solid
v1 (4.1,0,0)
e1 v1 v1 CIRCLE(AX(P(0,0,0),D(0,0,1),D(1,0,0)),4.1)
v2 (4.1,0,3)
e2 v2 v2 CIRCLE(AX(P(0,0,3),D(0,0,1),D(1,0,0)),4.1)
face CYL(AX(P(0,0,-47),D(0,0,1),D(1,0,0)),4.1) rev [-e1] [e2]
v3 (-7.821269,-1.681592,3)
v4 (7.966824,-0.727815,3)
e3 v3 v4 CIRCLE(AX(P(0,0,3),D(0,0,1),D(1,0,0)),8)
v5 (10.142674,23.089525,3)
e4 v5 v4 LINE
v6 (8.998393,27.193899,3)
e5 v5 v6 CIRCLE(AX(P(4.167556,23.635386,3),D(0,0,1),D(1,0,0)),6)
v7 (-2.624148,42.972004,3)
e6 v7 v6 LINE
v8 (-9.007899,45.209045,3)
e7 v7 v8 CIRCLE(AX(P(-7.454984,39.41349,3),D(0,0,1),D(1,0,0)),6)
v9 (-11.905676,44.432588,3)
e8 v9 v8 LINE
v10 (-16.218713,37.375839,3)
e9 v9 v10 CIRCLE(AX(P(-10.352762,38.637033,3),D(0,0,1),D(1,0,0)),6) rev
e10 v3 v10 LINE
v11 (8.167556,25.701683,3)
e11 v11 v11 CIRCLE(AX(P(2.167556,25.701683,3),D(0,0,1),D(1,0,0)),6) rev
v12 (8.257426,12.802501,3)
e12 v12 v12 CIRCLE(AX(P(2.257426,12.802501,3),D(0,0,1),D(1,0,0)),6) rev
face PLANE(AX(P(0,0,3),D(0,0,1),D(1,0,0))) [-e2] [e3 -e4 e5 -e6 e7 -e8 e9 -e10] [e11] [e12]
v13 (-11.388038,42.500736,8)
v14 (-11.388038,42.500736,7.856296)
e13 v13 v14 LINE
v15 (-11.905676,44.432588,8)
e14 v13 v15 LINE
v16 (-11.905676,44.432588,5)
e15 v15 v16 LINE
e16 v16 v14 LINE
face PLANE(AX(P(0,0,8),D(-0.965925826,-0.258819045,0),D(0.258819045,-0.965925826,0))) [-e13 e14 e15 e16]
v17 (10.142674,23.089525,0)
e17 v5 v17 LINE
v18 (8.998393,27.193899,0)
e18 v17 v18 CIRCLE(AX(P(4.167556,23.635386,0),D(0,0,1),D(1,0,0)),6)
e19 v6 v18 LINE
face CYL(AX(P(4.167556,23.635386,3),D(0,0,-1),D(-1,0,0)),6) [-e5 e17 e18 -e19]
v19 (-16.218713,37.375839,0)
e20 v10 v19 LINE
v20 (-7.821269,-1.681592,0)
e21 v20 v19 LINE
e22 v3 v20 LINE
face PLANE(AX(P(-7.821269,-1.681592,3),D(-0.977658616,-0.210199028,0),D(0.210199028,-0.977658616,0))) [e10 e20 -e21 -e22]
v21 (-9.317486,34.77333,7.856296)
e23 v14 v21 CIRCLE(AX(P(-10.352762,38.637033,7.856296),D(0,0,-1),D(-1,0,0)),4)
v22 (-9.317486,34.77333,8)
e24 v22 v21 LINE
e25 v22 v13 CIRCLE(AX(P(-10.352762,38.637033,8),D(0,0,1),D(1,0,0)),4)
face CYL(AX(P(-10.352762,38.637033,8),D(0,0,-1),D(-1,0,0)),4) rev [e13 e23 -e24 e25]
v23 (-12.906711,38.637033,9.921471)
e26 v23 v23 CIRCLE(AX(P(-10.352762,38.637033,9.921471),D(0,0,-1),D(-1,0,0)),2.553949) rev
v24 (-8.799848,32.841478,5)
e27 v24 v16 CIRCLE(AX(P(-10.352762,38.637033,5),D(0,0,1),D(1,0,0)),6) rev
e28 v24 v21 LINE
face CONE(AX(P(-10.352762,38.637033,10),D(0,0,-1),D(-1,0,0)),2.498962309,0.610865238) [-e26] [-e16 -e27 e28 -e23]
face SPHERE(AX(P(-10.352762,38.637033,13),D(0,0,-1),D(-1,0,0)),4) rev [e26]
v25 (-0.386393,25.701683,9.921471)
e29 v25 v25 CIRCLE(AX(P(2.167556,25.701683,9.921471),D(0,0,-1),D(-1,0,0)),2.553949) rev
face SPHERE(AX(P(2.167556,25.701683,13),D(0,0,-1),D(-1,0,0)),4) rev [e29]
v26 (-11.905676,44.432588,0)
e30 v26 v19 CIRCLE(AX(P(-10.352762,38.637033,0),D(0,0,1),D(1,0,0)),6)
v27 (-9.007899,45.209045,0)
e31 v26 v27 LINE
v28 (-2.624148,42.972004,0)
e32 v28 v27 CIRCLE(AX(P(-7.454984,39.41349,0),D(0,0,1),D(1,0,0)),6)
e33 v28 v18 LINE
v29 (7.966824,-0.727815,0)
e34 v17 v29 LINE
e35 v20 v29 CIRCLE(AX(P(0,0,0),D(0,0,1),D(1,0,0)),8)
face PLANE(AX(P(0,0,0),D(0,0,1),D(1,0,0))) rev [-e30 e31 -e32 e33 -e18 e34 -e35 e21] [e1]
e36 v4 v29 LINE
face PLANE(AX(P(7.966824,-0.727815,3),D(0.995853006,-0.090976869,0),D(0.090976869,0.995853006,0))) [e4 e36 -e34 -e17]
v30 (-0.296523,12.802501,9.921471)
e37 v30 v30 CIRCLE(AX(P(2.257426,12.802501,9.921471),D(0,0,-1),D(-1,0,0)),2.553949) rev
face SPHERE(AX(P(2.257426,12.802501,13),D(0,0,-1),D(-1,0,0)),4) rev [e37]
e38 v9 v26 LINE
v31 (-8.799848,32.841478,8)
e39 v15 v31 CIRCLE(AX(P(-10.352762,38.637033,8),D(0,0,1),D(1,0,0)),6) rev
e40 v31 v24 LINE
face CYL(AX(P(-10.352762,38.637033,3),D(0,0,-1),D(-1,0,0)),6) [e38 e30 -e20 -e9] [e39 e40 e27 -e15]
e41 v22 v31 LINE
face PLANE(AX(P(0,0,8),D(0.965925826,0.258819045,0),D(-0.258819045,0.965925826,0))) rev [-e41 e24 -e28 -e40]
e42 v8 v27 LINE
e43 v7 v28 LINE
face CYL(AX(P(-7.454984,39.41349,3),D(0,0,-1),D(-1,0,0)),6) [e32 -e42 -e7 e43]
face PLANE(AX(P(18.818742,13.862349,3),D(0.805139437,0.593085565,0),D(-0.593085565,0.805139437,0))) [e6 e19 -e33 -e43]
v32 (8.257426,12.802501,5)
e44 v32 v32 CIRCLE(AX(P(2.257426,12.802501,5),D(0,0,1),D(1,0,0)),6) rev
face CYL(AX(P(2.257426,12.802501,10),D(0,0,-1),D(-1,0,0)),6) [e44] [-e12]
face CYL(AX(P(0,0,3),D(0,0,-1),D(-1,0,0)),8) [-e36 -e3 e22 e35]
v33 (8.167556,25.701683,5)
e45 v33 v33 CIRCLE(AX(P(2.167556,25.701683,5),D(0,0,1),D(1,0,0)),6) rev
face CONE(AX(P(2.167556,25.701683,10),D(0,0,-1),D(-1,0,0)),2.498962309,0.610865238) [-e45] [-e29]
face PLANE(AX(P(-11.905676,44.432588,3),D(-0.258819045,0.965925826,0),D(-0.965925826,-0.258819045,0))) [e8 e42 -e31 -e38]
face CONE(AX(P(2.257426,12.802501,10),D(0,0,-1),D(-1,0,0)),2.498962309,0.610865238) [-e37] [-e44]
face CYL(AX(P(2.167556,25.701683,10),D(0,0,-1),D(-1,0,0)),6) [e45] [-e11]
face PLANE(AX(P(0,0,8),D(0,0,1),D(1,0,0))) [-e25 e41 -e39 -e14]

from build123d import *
from build123d.topology import SkipClean

# Parameters (mm, degrees)
BOSS_EXTRUDE1_DEPTH = 3
SKETCH3_R           = 4.1
CUT_EXTRUDE1_DEPTH  = 50
SKETCH1_3_R         = 6
BOSS_EXTRUDE2_DEPTH = 10
SKETCH1_4_R         = 6
BOSS_EXTRUDE3_DEPTH = 10
SKETCH1_5_R         = 6
BOSS_EXTRUDE8_DEPTH = 10
CHAMFER8_SIZE       = 5
CHAMFER8_SIZE_2     = 3.501037691
BOSS_EXTRUDE7_START = 1.9999999
BOSS_EXTRUDE7_DEPTH = 3.0000001


# Read off the part's stored shape, not the designer's step: Boss-Extrude7
with BuildPart() as part:
    # Sketch1 → Boss-Extrude1 (new body)
    with BuildSketch(Plane.XY):
        with BuildLine():
            ThreePointArc((-7.821268925, -1.68159222), (0.48240993, -7.985441795), (7.966824047, -0.727814955))
            Line((7.966824047, -0.727814955), (10.142674299, 23.089524856))
            ThreePointArc((10.142674299, 23.089524856), (9.947144202, 25.246709523), (8.998392886, 27.19389946))
            Line((8.998392886, 27.19389946), (-2.624147703, 42.972003574))
            ThreePointArc((-2.624147703, 42.972003574), (-5.470725652, 45.075885221), (-9.007898596, 45.209045145))
            Line((-9.007898596, 45.209045145), (-11.905676075, 44.432588009))
            ThreePointArc((-11.905676075, 44.432588009), (-15.472265696, 41.766039268), (-16.218713498, 37.375838886))
            Line((-16.218713498, 37.375838886), (-7.821268925, -1.68159222))
        make_face()
    extrude(amount=BOSS_EXTRUDE1_DEPTH)

    # Sketch3 → Cut-Extrude1 (cut)
    with BuildSketch(Plane.XY.offset(3)):
        Circle(SKETCH3_R)
    extrude(amount=-CUT_EXTRUDE1_DEPTH, mode=Mode.SUBTRACT)

    # Sketch1<3> → Boss-Extrude2 (add)
    with BuildSketch(Plane.XY):
        with Locations(Location((-10.352761804, 38.637033052, 0), (0, 0, 192.134016017))):
            Circle(SKETCH1_3_R)
    extrude(amount=BOSS_EXTRUDE2_DEPTH)

    # Sketch1<4> → Boss-Extrude3 (add)
    with BuildSketch(Plane.XY):
        with Locations((2.167556264, 25.701683368)):
            Circle(SKETCH1_4_R)
    extrude(amount=BOSS_EXTRUDE3_DEPTH)

    # Sketch1<5> → Boss-Extrude8 (add)
    with BuildSketch(Plane.XY):
        with Locations((2.25742631, 12.802500789)):
            Circle(SKETCH1_5_R)
    extrude(amount=BOSS_EXTRUDE8_DEPTH)

    # Sketch6 one side → Cut-Revolve1 (revolve, cut)
    with SkipClean():  # the faces are left unmerged after this step: merging them gives an invalid solid
        with BuildSketch(Plane(origin=(-10.352761804, 0, 0), x_dir=(0, 0, -1), z_dir=(1, 0, 0))):
            with BuildLine():
                ThreePointArc((-13, 34.637033052), (-10.171572875, 35.808605927), (-9, 38.637033052))
                ThreePointArc((-9, 38.637033052), (-10.171572875, 41.465460176), (-13, 42.637033052))
                Line((-13, 42.637033052), (-13, 34.637033052))
            make_face()
        revolve(axis=Axis((-10.352761804, 42.637033052, 13), (0, -1, 0)), mode=Mode.SUBTRACT)

    # Sketch7 one side → Cut-Revolve2 (revolve, cut)
    with SkipClean():  # the faces are left unmerged after this step: merging them gives an invalid solid
        with BuildSketch(Plane(origin=(2.167556264, 0, 0), x_dir=(0, 0, -1), z_dir=(1, 0, 0))):
            with BuildLine():
                ThreePointArc((-13, 21.701683368), (-10.171572875, 22.873256243), (-9, 25.701683368))
                ThreePointArc((-9, 25.701683368), (-10.171572875, 28.530110493), (-13, 29.701683368))
                Line((-13, 29.701683368), (-13, 21.701683368))
            make_face()
        revolve(axis=Axis((2.167556264, 29.701683368, 13), (0, -1, 0)), mode=Mode.SUBTRACT)

    # Sketch16 → Cut-Revolve3 (revolve, cut)
    with SkipClean():  # the faces are left unmerged after this step: merging them gives an invalid solid
        with BuildSketch(Plane(origin=(2.25742631, 0, 0), x_dir=(0, 0, -1), z_dir=(1, 0, 0))):
            with BuildLine():
                ThreePointArc((-9, 12.802500789), (-10.171572875, 15.630927914), (-13, 16.802500789))
                Line((-13, 16.802500789), (-13, 8.802500789))
                ThreePointArc((-13, 8.802500789), (-10.171572875, 9.974073664), (-9, 12.802500789))
            make_face()
            with BuildLine():
                Line((-13, 8.802500789), (-13, 16.802500789))
                ThreePointArc((-13, 16.802500789), (-17, 12.802500789), (-13, 8.802500789))
            make_face()
        revolve(axis=Axis((2.25742631, 16.802500789, 13), (0, -1, 0)), mode=Mode.SUBTRACT)

    # Chamfer8
    # the kernel refuses this chamfer: 5, 3.501037691 mm, written as the material it takes off along each edge
    with BuildSketch(Plane(origin=(-10.352761804, 38.637033052, 10), x_dir=(-0.9776586156884893, -0.21019902751931718, 0), z_dir=(-0.21019902751931718, 0.9776586156884893, 0))) as chamfer8_piece_1:
        Polygon((6, -CHAMFER8_SIZE), (6 - CHAMFER8_SIZE_2, 0), (6, 0), align=None)
    revolve(axis=Axis((-10.352761804, 38.637033052, 10), (0, 0, 1)), mode=Mode.SUBTRACT)
    with BuildSketch(Plane(origin=(2.167556264, 25.701683368, 10), x_dir=(1, 0, 0), z_dir=(0, -1, 0))) as chamfer8_piece_2:
        Polygon((6, -CHAMFER8_SIZE), (6 - CHAMFER8_SIZE_2, 0), (6, 0), align=None)
    revolve(axis=Axis((2.167556264, 25.701683368, 10), (0, 0, 1)), mode=Mode.SUBTRACT)
    with BuildSketch(Plane(origin=(2.25742631, 12.802500789, 10), x_dir=(1, 0, 0), z_dir=(0, -1, 0))) as chamfer8_piece_3:
        Polygon((6, -CHAMFER8_SIZE), (6 - CHAMFER8_SIZE_2, 0), (6, 0), align=None)
    revolve(axis=Axis((2.25742631, 12.802500789, 10), (0, 0, 1)), mode=Mode.SUBTRACT)

    # Boss-Extrude7 outline → Boss-Extrude7 (add)
    with BuildSketch(Plane.XY.offset(3).offset(BOSS_EXTRUDE7_START)):
        with BuildLine():
            ThreePointArc((-8.799847533, 32.841478094), (-4.557206846, 40.189947323), (-11.905676075, 44.43258801))
            Line((-11.905676075, 44.43258801), (-11.388037985, 42.500736357))
            ThreePointArc((-11.388037985, 42.500736357), (-6.489058499, 39.672309232), (-9.317485624, 34.773329746))
            Line((-9.317485624, 34.773329746), (-8.799847533, 32.841478094))
        make_face()
    extrude(amount=BOSS_EXTRUDE7_DEPTH)


solid = part.part
